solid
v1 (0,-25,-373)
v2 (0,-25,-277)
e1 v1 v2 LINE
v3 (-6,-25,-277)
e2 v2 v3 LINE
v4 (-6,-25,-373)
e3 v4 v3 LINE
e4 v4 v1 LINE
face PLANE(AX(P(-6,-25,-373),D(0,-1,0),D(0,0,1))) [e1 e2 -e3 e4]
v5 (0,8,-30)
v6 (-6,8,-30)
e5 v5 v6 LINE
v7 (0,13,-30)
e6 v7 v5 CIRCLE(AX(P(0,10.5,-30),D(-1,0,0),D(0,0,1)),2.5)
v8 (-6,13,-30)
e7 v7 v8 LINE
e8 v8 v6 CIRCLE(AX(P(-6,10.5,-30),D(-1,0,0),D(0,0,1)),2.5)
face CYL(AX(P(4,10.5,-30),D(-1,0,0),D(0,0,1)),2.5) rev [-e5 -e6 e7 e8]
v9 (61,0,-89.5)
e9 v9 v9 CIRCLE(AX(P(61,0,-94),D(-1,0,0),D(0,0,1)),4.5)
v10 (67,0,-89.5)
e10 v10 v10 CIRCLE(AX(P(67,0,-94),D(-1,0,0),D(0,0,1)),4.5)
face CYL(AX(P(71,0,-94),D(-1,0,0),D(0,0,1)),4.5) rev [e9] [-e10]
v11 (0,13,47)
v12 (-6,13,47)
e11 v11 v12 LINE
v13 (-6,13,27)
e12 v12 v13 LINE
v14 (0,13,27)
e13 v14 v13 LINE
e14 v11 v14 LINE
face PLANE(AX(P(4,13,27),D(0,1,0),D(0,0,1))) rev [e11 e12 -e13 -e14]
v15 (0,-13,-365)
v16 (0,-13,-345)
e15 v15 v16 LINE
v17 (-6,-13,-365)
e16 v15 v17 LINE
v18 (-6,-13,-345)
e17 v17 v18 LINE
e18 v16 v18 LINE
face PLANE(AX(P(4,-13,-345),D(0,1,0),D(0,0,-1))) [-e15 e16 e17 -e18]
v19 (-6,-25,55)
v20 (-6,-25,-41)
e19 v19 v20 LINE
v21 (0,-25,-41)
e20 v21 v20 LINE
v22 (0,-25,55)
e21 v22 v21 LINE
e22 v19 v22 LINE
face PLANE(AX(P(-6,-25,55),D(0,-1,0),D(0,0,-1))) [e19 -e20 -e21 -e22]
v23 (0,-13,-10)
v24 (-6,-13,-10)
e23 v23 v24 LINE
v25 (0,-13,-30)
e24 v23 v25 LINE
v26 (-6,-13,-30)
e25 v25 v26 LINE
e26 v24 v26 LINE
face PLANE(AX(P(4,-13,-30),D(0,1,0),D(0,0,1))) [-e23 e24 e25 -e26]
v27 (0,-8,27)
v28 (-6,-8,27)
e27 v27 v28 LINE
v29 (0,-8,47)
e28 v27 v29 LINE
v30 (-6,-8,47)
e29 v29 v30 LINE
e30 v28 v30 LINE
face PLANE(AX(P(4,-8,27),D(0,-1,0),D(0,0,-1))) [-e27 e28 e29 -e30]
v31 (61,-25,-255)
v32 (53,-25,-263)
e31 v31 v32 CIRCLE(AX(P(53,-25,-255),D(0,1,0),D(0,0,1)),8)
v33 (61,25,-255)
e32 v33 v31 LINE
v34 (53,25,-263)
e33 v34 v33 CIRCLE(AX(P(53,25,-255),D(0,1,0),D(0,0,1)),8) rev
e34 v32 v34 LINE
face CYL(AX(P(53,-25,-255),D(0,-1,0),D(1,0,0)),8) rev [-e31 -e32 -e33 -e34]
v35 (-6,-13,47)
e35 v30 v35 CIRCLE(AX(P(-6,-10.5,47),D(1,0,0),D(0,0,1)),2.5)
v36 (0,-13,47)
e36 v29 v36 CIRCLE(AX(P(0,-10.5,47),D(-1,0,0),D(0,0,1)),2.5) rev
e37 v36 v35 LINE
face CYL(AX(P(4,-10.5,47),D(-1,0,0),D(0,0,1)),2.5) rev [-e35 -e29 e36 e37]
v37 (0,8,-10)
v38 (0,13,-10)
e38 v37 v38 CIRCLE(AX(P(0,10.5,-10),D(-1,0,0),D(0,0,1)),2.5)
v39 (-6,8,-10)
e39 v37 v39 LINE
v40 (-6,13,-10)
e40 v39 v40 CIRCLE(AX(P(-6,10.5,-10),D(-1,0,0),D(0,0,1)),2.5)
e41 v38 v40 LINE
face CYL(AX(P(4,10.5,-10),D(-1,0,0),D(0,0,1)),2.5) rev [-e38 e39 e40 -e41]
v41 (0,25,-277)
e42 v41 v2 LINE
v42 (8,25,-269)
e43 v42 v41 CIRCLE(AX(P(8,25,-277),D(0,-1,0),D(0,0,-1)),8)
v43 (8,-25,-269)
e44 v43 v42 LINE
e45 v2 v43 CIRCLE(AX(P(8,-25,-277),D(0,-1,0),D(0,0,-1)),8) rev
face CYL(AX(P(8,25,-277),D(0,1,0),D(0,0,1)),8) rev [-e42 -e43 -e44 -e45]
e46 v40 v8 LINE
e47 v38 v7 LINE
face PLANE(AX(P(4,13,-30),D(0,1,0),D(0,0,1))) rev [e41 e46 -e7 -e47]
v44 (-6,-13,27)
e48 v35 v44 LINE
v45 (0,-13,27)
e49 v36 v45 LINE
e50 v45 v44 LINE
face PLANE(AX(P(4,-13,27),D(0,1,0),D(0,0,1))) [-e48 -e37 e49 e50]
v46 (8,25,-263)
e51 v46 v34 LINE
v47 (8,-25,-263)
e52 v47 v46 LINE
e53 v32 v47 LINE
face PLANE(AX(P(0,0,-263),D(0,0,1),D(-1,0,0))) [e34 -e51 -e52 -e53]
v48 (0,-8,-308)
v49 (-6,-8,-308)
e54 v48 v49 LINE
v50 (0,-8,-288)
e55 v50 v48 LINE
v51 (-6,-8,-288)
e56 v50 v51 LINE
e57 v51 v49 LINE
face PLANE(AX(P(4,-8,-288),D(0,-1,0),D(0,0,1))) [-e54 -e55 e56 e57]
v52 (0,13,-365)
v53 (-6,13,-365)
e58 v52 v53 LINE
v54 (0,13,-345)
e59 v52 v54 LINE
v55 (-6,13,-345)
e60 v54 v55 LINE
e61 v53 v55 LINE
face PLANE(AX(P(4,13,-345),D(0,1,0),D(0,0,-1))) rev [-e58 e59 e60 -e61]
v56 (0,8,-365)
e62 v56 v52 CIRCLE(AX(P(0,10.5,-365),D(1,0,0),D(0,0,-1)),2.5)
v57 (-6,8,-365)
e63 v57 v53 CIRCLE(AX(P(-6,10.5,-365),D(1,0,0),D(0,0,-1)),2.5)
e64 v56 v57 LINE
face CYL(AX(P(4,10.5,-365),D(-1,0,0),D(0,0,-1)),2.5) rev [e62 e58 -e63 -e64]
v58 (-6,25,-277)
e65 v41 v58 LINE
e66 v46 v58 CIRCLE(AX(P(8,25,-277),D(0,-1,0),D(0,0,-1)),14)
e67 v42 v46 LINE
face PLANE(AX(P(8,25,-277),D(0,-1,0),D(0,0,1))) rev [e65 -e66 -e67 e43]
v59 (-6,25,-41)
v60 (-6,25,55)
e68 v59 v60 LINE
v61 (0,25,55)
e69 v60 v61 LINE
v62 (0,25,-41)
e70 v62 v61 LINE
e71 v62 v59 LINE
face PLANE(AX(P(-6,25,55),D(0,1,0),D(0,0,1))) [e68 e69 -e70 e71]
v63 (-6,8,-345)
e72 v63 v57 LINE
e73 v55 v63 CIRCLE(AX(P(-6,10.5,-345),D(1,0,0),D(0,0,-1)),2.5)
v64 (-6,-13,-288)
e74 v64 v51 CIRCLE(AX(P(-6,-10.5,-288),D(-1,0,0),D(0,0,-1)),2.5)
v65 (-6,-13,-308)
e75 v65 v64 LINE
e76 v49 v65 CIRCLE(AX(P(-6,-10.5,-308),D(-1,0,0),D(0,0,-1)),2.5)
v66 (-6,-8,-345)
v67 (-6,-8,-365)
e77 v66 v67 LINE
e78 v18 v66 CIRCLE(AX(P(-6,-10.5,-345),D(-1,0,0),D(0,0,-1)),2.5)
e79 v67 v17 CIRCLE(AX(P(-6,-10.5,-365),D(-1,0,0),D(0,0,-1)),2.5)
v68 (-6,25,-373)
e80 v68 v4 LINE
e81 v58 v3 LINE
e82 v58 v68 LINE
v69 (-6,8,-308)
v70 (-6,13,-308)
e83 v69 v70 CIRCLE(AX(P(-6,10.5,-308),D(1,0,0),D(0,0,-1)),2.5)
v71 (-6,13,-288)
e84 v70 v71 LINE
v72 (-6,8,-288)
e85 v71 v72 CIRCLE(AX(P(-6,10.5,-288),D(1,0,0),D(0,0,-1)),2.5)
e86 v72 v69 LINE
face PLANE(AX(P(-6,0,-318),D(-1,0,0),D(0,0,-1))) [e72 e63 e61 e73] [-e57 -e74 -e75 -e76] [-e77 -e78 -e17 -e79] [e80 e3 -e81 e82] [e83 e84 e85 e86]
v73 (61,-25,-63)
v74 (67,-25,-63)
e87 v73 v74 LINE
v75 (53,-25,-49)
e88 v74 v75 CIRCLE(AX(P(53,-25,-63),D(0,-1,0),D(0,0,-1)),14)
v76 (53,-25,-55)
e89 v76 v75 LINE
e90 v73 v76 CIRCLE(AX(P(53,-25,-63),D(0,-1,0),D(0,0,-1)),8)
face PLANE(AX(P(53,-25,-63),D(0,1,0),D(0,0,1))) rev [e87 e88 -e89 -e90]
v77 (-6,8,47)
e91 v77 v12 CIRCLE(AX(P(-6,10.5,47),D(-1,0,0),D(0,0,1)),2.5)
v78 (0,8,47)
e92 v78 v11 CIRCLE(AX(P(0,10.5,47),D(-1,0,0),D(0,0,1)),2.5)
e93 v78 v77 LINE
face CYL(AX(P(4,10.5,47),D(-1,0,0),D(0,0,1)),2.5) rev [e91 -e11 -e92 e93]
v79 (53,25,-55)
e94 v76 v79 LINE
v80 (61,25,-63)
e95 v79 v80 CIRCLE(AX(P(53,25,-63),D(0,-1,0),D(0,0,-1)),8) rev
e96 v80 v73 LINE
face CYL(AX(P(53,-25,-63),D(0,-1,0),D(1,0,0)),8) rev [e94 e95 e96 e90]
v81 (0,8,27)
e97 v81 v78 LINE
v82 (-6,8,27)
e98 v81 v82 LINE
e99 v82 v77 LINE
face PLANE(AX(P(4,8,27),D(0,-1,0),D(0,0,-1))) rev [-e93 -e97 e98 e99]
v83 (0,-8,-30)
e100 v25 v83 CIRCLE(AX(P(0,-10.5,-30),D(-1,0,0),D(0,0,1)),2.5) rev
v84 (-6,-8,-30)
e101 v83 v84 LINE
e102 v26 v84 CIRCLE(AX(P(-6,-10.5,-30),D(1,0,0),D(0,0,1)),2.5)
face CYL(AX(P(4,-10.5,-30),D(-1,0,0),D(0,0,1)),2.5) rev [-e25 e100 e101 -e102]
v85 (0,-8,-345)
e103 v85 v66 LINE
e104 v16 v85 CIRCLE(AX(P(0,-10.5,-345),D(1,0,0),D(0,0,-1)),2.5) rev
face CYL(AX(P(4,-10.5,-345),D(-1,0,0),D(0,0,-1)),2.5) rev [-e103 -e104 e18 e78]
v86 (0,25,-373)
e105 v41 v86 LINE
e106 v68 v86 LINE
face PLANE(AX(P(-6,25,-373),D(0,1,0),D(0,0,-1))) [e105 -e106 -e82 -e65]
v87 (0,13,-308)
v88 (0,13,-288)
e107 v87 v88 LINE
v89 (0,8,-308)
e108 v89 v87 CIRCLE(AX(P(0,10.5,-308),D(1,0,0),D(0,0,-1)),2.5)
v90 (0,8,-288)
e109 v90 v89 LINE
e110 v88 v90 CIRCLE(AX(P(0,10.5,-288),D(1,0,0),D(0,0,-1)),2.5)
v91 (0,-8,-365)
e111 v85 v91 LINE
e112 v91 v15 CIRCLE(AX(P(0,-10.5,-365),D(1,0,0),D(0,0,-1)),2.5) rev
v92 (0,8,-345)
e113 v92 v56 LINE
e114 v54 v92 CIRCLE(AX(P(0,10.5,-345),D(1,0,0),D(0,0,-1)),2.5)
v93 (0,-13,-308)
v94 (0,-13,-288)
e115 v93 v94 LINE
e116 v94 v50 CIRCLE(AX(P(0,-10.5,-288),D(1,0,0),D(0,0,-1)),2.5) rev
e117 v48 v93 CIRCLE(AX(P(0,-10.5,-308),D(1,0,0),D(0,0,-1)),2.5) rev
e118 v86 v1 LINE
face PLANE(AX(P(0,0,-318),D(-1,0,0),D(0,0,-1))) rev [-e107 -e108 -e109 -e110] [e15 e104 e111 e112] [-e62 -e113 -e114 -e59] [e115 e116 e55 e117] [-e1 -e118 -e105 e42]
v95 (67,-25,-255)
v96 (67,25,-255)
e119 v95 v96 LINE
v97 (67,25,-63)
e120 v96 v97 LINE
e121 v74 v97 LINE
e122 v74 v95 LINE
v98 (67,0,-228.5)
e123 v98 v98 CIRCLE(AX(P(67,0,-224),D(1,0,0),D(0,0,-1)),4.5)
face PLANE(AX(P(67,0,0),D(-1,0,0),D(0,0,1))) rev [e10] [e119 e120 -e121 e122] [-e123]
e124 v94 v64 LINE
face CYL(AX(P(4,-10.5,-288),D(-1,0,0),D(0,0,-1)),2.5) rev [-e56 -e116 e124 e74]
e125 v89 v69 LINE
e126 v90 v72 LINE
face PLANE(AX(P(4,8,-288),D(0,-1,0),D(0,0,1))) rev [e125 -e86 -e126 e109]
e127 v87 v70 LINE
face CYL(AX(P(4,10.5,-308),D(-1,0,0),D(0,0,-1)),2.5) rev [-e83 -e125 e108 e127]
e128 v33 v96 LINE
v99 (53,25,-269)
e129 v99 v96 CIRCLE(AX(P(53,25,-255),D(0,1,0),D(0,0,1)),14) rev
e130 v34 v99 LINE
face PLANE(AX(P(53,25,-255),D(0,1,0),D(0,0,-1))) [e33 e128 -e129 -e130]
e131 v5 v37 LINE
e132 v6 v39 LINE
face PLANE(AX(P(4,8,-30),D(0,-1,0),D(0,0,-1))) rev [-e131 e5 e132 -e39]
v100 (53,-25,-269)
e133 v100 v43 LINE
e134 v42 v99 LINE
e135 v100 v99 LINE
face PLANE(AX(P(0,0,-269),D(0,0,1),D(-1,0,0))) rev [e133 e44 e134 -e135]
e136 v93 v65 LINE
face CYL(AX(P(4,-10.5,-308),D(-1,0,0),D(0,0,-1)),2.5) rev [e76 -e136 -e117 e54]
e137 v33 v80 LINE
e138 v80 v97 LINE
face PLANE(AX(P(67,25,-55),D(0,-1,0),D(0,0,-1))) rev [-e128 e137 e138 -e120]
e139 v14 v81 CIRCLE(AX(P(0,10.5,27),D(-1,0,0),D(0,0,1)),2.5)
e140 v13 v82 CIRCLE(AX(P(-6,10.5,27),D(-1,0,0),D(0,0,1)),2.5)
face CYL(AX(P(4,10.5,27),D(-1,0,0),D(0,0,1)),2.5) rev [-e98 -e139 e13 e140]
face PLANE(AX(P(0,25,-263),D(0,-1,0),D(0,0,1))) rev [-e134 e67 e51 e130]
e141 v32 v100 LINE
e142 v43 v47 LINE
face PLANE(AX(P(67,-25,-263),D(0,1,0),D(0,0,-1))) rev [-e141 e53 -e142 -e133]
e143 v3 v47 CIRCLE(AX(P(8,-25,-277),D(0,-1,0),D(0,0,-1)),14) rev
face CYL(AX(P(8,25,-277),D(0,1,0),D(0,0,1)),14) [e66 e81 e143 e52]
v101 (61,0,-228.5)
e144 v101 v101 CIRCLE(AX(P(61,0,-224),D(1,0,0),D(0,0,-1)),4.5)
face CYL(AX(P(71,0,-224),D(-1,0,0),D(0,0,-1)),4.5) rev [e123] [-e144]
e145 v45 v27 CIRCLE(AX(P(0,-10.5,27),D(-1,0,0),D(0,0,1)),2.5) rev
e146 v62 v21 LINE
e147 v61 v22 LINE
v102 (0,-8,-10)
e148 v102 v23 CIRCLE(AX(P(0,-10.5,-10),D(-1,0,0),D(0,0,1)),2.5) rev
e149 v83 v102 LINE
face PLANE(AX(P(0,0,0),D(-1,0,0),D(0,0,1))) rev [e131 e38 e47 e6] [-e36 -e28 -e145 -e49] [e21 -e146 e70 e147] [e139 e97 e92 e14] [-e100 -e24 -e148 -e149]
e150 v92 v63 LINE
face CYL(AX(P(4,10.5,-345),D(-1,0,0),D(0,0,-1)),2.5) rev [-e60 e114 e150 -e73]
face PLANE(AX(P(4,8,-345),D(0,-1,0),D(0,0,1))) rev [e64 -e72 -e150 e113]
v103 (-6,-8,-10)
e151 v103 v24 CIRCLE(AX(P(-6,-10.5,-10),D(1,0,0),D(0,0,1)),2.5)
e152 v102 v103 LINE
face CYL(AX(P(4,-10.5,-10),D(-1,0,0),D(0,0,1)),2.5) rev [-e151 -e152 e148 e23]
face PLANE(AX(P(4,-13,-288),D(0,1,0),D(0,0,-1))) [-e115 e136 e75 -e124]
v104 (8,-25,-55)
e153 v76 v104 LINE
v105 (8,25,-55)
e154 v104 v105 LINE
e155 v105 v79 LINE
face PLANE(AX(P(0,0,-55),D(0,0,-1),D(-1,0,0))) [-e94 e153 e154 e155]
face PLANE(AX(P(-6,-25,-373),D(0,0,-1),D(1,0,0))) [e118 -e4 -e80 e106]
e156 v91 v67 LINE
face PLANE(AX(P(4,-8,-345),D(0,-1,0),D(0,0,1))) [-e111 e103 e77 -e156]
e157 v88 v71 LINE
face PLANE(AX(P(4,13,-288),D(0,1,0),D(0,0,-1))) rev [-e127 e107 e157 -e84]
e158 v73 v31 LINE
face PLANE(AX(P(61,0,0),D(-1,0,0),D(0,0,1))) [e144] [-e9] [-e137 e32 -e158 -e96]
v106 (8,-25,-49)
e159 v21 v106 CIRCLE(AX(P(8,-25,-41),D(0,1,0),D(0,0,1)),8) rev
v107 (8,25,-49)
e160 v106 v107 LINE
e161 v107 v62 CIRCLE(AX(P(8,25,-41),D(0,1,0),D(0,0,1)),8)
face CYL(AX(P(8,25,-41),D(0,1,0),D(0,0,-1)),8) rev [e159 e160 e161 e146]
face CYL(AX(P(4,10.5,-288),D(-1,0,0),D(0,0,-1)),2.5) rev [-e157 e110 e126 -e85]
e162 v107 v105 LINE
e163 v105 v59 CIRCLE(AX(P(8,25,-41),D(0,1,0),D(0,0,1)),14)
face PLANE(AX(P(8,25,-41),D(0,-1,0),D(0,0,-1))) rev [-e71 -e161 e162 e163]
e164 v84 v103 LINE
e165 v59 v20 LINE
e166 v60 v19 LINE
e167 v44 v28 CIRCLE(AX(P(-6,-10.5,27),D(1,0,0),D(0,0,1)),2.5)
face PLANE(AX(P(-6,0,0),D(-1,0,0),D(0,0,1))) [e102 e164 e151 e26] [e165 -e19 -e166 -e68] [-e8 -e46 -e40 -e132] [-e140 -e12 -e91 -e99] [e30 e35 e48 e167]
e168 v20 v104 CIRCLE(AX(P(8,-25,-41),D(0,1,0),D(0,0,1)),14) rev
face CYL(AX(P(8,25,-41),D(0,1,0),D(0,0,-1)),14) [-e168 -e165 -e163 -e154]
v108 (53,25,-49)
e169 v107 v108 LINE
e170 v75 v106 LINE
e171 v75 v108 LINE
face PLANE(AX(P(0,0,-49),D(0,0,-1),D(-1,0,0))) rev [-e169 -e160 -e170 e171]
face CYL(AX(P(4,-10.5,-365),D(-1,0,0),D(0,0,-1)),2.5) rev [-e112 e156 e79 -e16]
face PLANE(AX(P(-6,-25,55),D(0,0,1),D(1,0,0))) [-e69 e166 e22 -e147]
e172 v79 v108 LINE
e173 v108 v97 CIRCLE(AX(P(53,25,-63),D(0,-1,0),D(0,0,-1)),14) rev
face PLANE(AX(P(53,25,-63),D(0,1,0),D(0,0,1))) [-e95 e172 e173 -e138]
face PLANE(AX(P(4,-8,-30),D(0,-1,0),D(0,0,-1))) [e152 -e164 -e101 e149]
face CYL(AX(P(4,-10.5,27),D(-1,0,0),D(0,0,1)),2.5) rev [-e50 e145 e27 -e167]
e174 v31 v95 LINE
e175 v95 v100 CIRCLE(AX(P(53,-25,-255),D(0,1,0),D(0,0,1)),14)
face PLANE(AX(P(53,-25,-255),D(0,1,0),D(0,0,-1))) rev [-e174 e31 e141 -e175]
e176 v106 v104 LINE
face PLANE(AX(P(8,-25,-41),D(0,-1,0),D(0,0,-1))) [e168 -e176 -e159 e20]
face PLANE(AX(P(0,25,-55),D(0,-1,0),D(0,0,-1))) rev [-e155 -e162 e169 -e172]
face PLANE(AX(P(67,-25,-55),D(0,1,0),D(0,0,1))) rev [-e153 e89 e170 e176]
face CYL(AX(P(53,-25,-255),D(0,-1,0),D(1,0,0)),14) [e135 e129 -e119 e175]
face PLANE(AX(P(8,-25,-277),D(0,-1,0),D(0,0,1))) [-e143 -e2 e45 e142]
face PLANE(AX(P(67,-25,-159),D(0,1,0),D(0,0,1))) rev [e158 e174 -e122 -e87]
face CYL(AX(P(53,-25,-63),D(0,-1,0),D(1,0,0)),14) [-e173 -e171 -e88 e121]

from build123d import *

# Parameters (mm, degrees)
SKETCH1_W                    = 110
SKETCH1_H                    = 50
BASE_FLANGE1_DEPTH           = 6
CUT_EXTRUDE1_DEPTH           = 10
LPATTERN1_COUNT              = 2
LPATTERN1_PITCH              = 57
MIRROR1_COPY_1_DEPTH         = 10
EDGE_FLANGE1_STRIP_W         = 40
EDGE_FLANGE1_STRIP_H         = 6
EDGE_FLANGE1_STRIP_CUT_DEPTH = 50
EDGE_FLANGE1_DEPTH           = 50
EDGE_FLANGE2_STRIP_W         = 40
EDGE_FLANGE2_STRIP_H         = 6
EDGE_FLANGE2_STRIP_CUT_DEPTH = 50
EDGE_FLANGE2_DEPTH           = 50
SKETCH9_R                    = 4.5
CUT_EXTRUDE2_DEPTH           = 10


# Sheet-metal steps are written as plain solids
with BuildPart() as part:
    # Sketch1 → Base-Flange1 (new body)
    with BuildSketch(Plane(origin=(0, 0, 0), x_dir=(0, 0, -1), z_dir=(1, 0, 0))):
        Rectangle(SKETCH1_W, SKETCH1_H)
    extrude(amount=-BASE_FLANGE1_DEPTH)

    # Sketch5 → Cut-Extrude1 (cut)
    with BuildSketch(Plane.ZY.offset(6)):
        with BuildLine():
            Line((-30, 13), (-10, 13))
            ThreePointArc((-10, 13), (-7.5, 10.5), (-10, 8))
            Line((-10, 8), (-30, 8))
            ThreePointArc((-30, 8), (-32.5, 10.5), (-30, 13))
        make_face()
    cut_extrude1 = extrude(amount=-CUT_EXTRUDE1_DEPTH, mode=Mode.SUBTRACT)

    # LPattern1: Cut-Extrude1 ×2
    with Locations(*[(0, 0, i * LPATTERN1_PITCH) for i in range(1, LPATTERN1_COUNT)]):
        add(cut_extrude1, mode=Mode.SUBTRACT)

    # Mirror1: Cut-Extrude1 across plane
    add(cut_extrude1.mirror(Plane.ZX), mode=Mode.SUBTRACT)

    # Mirror1 copy 1 sketch → Mirror1 copy 1 (cut)
    with BuildSketch(Plane(origin=(-6, 0, 57), x_dir=(0, 0, 1), z_dir=(-1, 0, 0))):
        with BuildLine():
            Line((-30, -13), (-10, -13))
            ThreePointArc((-10, -13), (-7.5, -10.5), (-10, -8))
            Line((-10, -8), (-30, -8))
            ThreePointArc((-30, -8), (-32.5, -10.5), (-30, -13))
        make_face()
    extrude(amount=-MIRROR1_COPY_1_DEPTH, mode=Mode.SUBTRACT)

    # Edge-Flange1 strip (across the edge) → Edge-Flange1 strip cut (cut)
    with BuildSketch(Plane(origin=(0, -25, -55), x_dir=(0, 0, 1), z_dir=(0, 1, 0))):
        with Locations((-6, -3)):
            Rectangle(EDGE_FLANGE1_STRIP_W, EDGE_FLANGE1_STRIP_H)
    extrude(amount=EDGE_FLANGE1_STRIP_CUT_DEPTH, mode=Mode.SUBTRACT)

    # Edge-Flange1 section (across the edge) → Edge-Flange1 (add)
    with BuildSketch(Plane(origin=(0, -25, -55), x_dir=(0, 0, 1), z_dir=(0, 1, 0))):
        with BuildLine():
            Line((0, 8), (0, 67))
            Line((0, 67), (6, 67))
            Line((6, 67), (6, 8))
            ThreePointArc((6, 8), (8.343145751, 2.343145751), (14, 0))
            Line((14, 0), (14, -6))
            ThreePointArc((14, -6), (4.100505063, -1.899494937), (0, 8))
        make_face()
    extrude(amount=EDGE_FLANGE1_DEPTH)

    # Edge-Flange2 strip (across the edge) → Edge-Flange2 strip cut (cut)
    with BuildSketch(Plane(origin=(67, 25, -55), x_dir=(-1, 0, 0), z_dir=(0, -1, 0))):
        with Locations((-6, -3)):
            Rectangle(EDGE_FLANGE2_STRIP_W, EDGE_FLANGE2_STRIP_H)
    extrude(amount=EDGE_FLANGE2_STRIP_CUT_DEPTH, mode=Mode.SUBTRACT)

    # Edge-Flange2 section (across the edge) → Edge-Flange2 (add)
    with BuildSketch(Plane(origin=(67, 25, -55), x_dir=(-1, 0, 0), z_dir=(0, -1, 0))):
        with BuildLine():
            Line((0, 8), (0, 104))
            Line((0, 104), (6, 104))
            Line((6, 104), (6, 8))
            ThreePointArc((6, 8), (8.343145751, 2.343145751), (14, 0))
            Line((14, 0), (14, -6))
            ThreePointArc((14, -6), (4.100505063, -1.899494937), (0, 8))
        make_face()
    extrude(amount=EDGE_FLANGE2_DEPTH)

    # Sketch9 → Cut-Extrude2 (cut)
    with BuildSketch(Plane.ZY.offset(-61)):
        with Locations((-94, 0)):
            Circle(SKETCH9_R)
    extrude(amount=-CUT_EXTRUDE2_DEPTH, mode=Mode.SUBTRACT)

    # Mirror2: part across plane


with BuildPart() as part_1:
    add(part.part)
    add(part.part.mirror(Plane(origin=(67, 25, -159), x_dir=(1, 0, 0), z_dir=(0, 0, 1))))


solid = part_1.part
